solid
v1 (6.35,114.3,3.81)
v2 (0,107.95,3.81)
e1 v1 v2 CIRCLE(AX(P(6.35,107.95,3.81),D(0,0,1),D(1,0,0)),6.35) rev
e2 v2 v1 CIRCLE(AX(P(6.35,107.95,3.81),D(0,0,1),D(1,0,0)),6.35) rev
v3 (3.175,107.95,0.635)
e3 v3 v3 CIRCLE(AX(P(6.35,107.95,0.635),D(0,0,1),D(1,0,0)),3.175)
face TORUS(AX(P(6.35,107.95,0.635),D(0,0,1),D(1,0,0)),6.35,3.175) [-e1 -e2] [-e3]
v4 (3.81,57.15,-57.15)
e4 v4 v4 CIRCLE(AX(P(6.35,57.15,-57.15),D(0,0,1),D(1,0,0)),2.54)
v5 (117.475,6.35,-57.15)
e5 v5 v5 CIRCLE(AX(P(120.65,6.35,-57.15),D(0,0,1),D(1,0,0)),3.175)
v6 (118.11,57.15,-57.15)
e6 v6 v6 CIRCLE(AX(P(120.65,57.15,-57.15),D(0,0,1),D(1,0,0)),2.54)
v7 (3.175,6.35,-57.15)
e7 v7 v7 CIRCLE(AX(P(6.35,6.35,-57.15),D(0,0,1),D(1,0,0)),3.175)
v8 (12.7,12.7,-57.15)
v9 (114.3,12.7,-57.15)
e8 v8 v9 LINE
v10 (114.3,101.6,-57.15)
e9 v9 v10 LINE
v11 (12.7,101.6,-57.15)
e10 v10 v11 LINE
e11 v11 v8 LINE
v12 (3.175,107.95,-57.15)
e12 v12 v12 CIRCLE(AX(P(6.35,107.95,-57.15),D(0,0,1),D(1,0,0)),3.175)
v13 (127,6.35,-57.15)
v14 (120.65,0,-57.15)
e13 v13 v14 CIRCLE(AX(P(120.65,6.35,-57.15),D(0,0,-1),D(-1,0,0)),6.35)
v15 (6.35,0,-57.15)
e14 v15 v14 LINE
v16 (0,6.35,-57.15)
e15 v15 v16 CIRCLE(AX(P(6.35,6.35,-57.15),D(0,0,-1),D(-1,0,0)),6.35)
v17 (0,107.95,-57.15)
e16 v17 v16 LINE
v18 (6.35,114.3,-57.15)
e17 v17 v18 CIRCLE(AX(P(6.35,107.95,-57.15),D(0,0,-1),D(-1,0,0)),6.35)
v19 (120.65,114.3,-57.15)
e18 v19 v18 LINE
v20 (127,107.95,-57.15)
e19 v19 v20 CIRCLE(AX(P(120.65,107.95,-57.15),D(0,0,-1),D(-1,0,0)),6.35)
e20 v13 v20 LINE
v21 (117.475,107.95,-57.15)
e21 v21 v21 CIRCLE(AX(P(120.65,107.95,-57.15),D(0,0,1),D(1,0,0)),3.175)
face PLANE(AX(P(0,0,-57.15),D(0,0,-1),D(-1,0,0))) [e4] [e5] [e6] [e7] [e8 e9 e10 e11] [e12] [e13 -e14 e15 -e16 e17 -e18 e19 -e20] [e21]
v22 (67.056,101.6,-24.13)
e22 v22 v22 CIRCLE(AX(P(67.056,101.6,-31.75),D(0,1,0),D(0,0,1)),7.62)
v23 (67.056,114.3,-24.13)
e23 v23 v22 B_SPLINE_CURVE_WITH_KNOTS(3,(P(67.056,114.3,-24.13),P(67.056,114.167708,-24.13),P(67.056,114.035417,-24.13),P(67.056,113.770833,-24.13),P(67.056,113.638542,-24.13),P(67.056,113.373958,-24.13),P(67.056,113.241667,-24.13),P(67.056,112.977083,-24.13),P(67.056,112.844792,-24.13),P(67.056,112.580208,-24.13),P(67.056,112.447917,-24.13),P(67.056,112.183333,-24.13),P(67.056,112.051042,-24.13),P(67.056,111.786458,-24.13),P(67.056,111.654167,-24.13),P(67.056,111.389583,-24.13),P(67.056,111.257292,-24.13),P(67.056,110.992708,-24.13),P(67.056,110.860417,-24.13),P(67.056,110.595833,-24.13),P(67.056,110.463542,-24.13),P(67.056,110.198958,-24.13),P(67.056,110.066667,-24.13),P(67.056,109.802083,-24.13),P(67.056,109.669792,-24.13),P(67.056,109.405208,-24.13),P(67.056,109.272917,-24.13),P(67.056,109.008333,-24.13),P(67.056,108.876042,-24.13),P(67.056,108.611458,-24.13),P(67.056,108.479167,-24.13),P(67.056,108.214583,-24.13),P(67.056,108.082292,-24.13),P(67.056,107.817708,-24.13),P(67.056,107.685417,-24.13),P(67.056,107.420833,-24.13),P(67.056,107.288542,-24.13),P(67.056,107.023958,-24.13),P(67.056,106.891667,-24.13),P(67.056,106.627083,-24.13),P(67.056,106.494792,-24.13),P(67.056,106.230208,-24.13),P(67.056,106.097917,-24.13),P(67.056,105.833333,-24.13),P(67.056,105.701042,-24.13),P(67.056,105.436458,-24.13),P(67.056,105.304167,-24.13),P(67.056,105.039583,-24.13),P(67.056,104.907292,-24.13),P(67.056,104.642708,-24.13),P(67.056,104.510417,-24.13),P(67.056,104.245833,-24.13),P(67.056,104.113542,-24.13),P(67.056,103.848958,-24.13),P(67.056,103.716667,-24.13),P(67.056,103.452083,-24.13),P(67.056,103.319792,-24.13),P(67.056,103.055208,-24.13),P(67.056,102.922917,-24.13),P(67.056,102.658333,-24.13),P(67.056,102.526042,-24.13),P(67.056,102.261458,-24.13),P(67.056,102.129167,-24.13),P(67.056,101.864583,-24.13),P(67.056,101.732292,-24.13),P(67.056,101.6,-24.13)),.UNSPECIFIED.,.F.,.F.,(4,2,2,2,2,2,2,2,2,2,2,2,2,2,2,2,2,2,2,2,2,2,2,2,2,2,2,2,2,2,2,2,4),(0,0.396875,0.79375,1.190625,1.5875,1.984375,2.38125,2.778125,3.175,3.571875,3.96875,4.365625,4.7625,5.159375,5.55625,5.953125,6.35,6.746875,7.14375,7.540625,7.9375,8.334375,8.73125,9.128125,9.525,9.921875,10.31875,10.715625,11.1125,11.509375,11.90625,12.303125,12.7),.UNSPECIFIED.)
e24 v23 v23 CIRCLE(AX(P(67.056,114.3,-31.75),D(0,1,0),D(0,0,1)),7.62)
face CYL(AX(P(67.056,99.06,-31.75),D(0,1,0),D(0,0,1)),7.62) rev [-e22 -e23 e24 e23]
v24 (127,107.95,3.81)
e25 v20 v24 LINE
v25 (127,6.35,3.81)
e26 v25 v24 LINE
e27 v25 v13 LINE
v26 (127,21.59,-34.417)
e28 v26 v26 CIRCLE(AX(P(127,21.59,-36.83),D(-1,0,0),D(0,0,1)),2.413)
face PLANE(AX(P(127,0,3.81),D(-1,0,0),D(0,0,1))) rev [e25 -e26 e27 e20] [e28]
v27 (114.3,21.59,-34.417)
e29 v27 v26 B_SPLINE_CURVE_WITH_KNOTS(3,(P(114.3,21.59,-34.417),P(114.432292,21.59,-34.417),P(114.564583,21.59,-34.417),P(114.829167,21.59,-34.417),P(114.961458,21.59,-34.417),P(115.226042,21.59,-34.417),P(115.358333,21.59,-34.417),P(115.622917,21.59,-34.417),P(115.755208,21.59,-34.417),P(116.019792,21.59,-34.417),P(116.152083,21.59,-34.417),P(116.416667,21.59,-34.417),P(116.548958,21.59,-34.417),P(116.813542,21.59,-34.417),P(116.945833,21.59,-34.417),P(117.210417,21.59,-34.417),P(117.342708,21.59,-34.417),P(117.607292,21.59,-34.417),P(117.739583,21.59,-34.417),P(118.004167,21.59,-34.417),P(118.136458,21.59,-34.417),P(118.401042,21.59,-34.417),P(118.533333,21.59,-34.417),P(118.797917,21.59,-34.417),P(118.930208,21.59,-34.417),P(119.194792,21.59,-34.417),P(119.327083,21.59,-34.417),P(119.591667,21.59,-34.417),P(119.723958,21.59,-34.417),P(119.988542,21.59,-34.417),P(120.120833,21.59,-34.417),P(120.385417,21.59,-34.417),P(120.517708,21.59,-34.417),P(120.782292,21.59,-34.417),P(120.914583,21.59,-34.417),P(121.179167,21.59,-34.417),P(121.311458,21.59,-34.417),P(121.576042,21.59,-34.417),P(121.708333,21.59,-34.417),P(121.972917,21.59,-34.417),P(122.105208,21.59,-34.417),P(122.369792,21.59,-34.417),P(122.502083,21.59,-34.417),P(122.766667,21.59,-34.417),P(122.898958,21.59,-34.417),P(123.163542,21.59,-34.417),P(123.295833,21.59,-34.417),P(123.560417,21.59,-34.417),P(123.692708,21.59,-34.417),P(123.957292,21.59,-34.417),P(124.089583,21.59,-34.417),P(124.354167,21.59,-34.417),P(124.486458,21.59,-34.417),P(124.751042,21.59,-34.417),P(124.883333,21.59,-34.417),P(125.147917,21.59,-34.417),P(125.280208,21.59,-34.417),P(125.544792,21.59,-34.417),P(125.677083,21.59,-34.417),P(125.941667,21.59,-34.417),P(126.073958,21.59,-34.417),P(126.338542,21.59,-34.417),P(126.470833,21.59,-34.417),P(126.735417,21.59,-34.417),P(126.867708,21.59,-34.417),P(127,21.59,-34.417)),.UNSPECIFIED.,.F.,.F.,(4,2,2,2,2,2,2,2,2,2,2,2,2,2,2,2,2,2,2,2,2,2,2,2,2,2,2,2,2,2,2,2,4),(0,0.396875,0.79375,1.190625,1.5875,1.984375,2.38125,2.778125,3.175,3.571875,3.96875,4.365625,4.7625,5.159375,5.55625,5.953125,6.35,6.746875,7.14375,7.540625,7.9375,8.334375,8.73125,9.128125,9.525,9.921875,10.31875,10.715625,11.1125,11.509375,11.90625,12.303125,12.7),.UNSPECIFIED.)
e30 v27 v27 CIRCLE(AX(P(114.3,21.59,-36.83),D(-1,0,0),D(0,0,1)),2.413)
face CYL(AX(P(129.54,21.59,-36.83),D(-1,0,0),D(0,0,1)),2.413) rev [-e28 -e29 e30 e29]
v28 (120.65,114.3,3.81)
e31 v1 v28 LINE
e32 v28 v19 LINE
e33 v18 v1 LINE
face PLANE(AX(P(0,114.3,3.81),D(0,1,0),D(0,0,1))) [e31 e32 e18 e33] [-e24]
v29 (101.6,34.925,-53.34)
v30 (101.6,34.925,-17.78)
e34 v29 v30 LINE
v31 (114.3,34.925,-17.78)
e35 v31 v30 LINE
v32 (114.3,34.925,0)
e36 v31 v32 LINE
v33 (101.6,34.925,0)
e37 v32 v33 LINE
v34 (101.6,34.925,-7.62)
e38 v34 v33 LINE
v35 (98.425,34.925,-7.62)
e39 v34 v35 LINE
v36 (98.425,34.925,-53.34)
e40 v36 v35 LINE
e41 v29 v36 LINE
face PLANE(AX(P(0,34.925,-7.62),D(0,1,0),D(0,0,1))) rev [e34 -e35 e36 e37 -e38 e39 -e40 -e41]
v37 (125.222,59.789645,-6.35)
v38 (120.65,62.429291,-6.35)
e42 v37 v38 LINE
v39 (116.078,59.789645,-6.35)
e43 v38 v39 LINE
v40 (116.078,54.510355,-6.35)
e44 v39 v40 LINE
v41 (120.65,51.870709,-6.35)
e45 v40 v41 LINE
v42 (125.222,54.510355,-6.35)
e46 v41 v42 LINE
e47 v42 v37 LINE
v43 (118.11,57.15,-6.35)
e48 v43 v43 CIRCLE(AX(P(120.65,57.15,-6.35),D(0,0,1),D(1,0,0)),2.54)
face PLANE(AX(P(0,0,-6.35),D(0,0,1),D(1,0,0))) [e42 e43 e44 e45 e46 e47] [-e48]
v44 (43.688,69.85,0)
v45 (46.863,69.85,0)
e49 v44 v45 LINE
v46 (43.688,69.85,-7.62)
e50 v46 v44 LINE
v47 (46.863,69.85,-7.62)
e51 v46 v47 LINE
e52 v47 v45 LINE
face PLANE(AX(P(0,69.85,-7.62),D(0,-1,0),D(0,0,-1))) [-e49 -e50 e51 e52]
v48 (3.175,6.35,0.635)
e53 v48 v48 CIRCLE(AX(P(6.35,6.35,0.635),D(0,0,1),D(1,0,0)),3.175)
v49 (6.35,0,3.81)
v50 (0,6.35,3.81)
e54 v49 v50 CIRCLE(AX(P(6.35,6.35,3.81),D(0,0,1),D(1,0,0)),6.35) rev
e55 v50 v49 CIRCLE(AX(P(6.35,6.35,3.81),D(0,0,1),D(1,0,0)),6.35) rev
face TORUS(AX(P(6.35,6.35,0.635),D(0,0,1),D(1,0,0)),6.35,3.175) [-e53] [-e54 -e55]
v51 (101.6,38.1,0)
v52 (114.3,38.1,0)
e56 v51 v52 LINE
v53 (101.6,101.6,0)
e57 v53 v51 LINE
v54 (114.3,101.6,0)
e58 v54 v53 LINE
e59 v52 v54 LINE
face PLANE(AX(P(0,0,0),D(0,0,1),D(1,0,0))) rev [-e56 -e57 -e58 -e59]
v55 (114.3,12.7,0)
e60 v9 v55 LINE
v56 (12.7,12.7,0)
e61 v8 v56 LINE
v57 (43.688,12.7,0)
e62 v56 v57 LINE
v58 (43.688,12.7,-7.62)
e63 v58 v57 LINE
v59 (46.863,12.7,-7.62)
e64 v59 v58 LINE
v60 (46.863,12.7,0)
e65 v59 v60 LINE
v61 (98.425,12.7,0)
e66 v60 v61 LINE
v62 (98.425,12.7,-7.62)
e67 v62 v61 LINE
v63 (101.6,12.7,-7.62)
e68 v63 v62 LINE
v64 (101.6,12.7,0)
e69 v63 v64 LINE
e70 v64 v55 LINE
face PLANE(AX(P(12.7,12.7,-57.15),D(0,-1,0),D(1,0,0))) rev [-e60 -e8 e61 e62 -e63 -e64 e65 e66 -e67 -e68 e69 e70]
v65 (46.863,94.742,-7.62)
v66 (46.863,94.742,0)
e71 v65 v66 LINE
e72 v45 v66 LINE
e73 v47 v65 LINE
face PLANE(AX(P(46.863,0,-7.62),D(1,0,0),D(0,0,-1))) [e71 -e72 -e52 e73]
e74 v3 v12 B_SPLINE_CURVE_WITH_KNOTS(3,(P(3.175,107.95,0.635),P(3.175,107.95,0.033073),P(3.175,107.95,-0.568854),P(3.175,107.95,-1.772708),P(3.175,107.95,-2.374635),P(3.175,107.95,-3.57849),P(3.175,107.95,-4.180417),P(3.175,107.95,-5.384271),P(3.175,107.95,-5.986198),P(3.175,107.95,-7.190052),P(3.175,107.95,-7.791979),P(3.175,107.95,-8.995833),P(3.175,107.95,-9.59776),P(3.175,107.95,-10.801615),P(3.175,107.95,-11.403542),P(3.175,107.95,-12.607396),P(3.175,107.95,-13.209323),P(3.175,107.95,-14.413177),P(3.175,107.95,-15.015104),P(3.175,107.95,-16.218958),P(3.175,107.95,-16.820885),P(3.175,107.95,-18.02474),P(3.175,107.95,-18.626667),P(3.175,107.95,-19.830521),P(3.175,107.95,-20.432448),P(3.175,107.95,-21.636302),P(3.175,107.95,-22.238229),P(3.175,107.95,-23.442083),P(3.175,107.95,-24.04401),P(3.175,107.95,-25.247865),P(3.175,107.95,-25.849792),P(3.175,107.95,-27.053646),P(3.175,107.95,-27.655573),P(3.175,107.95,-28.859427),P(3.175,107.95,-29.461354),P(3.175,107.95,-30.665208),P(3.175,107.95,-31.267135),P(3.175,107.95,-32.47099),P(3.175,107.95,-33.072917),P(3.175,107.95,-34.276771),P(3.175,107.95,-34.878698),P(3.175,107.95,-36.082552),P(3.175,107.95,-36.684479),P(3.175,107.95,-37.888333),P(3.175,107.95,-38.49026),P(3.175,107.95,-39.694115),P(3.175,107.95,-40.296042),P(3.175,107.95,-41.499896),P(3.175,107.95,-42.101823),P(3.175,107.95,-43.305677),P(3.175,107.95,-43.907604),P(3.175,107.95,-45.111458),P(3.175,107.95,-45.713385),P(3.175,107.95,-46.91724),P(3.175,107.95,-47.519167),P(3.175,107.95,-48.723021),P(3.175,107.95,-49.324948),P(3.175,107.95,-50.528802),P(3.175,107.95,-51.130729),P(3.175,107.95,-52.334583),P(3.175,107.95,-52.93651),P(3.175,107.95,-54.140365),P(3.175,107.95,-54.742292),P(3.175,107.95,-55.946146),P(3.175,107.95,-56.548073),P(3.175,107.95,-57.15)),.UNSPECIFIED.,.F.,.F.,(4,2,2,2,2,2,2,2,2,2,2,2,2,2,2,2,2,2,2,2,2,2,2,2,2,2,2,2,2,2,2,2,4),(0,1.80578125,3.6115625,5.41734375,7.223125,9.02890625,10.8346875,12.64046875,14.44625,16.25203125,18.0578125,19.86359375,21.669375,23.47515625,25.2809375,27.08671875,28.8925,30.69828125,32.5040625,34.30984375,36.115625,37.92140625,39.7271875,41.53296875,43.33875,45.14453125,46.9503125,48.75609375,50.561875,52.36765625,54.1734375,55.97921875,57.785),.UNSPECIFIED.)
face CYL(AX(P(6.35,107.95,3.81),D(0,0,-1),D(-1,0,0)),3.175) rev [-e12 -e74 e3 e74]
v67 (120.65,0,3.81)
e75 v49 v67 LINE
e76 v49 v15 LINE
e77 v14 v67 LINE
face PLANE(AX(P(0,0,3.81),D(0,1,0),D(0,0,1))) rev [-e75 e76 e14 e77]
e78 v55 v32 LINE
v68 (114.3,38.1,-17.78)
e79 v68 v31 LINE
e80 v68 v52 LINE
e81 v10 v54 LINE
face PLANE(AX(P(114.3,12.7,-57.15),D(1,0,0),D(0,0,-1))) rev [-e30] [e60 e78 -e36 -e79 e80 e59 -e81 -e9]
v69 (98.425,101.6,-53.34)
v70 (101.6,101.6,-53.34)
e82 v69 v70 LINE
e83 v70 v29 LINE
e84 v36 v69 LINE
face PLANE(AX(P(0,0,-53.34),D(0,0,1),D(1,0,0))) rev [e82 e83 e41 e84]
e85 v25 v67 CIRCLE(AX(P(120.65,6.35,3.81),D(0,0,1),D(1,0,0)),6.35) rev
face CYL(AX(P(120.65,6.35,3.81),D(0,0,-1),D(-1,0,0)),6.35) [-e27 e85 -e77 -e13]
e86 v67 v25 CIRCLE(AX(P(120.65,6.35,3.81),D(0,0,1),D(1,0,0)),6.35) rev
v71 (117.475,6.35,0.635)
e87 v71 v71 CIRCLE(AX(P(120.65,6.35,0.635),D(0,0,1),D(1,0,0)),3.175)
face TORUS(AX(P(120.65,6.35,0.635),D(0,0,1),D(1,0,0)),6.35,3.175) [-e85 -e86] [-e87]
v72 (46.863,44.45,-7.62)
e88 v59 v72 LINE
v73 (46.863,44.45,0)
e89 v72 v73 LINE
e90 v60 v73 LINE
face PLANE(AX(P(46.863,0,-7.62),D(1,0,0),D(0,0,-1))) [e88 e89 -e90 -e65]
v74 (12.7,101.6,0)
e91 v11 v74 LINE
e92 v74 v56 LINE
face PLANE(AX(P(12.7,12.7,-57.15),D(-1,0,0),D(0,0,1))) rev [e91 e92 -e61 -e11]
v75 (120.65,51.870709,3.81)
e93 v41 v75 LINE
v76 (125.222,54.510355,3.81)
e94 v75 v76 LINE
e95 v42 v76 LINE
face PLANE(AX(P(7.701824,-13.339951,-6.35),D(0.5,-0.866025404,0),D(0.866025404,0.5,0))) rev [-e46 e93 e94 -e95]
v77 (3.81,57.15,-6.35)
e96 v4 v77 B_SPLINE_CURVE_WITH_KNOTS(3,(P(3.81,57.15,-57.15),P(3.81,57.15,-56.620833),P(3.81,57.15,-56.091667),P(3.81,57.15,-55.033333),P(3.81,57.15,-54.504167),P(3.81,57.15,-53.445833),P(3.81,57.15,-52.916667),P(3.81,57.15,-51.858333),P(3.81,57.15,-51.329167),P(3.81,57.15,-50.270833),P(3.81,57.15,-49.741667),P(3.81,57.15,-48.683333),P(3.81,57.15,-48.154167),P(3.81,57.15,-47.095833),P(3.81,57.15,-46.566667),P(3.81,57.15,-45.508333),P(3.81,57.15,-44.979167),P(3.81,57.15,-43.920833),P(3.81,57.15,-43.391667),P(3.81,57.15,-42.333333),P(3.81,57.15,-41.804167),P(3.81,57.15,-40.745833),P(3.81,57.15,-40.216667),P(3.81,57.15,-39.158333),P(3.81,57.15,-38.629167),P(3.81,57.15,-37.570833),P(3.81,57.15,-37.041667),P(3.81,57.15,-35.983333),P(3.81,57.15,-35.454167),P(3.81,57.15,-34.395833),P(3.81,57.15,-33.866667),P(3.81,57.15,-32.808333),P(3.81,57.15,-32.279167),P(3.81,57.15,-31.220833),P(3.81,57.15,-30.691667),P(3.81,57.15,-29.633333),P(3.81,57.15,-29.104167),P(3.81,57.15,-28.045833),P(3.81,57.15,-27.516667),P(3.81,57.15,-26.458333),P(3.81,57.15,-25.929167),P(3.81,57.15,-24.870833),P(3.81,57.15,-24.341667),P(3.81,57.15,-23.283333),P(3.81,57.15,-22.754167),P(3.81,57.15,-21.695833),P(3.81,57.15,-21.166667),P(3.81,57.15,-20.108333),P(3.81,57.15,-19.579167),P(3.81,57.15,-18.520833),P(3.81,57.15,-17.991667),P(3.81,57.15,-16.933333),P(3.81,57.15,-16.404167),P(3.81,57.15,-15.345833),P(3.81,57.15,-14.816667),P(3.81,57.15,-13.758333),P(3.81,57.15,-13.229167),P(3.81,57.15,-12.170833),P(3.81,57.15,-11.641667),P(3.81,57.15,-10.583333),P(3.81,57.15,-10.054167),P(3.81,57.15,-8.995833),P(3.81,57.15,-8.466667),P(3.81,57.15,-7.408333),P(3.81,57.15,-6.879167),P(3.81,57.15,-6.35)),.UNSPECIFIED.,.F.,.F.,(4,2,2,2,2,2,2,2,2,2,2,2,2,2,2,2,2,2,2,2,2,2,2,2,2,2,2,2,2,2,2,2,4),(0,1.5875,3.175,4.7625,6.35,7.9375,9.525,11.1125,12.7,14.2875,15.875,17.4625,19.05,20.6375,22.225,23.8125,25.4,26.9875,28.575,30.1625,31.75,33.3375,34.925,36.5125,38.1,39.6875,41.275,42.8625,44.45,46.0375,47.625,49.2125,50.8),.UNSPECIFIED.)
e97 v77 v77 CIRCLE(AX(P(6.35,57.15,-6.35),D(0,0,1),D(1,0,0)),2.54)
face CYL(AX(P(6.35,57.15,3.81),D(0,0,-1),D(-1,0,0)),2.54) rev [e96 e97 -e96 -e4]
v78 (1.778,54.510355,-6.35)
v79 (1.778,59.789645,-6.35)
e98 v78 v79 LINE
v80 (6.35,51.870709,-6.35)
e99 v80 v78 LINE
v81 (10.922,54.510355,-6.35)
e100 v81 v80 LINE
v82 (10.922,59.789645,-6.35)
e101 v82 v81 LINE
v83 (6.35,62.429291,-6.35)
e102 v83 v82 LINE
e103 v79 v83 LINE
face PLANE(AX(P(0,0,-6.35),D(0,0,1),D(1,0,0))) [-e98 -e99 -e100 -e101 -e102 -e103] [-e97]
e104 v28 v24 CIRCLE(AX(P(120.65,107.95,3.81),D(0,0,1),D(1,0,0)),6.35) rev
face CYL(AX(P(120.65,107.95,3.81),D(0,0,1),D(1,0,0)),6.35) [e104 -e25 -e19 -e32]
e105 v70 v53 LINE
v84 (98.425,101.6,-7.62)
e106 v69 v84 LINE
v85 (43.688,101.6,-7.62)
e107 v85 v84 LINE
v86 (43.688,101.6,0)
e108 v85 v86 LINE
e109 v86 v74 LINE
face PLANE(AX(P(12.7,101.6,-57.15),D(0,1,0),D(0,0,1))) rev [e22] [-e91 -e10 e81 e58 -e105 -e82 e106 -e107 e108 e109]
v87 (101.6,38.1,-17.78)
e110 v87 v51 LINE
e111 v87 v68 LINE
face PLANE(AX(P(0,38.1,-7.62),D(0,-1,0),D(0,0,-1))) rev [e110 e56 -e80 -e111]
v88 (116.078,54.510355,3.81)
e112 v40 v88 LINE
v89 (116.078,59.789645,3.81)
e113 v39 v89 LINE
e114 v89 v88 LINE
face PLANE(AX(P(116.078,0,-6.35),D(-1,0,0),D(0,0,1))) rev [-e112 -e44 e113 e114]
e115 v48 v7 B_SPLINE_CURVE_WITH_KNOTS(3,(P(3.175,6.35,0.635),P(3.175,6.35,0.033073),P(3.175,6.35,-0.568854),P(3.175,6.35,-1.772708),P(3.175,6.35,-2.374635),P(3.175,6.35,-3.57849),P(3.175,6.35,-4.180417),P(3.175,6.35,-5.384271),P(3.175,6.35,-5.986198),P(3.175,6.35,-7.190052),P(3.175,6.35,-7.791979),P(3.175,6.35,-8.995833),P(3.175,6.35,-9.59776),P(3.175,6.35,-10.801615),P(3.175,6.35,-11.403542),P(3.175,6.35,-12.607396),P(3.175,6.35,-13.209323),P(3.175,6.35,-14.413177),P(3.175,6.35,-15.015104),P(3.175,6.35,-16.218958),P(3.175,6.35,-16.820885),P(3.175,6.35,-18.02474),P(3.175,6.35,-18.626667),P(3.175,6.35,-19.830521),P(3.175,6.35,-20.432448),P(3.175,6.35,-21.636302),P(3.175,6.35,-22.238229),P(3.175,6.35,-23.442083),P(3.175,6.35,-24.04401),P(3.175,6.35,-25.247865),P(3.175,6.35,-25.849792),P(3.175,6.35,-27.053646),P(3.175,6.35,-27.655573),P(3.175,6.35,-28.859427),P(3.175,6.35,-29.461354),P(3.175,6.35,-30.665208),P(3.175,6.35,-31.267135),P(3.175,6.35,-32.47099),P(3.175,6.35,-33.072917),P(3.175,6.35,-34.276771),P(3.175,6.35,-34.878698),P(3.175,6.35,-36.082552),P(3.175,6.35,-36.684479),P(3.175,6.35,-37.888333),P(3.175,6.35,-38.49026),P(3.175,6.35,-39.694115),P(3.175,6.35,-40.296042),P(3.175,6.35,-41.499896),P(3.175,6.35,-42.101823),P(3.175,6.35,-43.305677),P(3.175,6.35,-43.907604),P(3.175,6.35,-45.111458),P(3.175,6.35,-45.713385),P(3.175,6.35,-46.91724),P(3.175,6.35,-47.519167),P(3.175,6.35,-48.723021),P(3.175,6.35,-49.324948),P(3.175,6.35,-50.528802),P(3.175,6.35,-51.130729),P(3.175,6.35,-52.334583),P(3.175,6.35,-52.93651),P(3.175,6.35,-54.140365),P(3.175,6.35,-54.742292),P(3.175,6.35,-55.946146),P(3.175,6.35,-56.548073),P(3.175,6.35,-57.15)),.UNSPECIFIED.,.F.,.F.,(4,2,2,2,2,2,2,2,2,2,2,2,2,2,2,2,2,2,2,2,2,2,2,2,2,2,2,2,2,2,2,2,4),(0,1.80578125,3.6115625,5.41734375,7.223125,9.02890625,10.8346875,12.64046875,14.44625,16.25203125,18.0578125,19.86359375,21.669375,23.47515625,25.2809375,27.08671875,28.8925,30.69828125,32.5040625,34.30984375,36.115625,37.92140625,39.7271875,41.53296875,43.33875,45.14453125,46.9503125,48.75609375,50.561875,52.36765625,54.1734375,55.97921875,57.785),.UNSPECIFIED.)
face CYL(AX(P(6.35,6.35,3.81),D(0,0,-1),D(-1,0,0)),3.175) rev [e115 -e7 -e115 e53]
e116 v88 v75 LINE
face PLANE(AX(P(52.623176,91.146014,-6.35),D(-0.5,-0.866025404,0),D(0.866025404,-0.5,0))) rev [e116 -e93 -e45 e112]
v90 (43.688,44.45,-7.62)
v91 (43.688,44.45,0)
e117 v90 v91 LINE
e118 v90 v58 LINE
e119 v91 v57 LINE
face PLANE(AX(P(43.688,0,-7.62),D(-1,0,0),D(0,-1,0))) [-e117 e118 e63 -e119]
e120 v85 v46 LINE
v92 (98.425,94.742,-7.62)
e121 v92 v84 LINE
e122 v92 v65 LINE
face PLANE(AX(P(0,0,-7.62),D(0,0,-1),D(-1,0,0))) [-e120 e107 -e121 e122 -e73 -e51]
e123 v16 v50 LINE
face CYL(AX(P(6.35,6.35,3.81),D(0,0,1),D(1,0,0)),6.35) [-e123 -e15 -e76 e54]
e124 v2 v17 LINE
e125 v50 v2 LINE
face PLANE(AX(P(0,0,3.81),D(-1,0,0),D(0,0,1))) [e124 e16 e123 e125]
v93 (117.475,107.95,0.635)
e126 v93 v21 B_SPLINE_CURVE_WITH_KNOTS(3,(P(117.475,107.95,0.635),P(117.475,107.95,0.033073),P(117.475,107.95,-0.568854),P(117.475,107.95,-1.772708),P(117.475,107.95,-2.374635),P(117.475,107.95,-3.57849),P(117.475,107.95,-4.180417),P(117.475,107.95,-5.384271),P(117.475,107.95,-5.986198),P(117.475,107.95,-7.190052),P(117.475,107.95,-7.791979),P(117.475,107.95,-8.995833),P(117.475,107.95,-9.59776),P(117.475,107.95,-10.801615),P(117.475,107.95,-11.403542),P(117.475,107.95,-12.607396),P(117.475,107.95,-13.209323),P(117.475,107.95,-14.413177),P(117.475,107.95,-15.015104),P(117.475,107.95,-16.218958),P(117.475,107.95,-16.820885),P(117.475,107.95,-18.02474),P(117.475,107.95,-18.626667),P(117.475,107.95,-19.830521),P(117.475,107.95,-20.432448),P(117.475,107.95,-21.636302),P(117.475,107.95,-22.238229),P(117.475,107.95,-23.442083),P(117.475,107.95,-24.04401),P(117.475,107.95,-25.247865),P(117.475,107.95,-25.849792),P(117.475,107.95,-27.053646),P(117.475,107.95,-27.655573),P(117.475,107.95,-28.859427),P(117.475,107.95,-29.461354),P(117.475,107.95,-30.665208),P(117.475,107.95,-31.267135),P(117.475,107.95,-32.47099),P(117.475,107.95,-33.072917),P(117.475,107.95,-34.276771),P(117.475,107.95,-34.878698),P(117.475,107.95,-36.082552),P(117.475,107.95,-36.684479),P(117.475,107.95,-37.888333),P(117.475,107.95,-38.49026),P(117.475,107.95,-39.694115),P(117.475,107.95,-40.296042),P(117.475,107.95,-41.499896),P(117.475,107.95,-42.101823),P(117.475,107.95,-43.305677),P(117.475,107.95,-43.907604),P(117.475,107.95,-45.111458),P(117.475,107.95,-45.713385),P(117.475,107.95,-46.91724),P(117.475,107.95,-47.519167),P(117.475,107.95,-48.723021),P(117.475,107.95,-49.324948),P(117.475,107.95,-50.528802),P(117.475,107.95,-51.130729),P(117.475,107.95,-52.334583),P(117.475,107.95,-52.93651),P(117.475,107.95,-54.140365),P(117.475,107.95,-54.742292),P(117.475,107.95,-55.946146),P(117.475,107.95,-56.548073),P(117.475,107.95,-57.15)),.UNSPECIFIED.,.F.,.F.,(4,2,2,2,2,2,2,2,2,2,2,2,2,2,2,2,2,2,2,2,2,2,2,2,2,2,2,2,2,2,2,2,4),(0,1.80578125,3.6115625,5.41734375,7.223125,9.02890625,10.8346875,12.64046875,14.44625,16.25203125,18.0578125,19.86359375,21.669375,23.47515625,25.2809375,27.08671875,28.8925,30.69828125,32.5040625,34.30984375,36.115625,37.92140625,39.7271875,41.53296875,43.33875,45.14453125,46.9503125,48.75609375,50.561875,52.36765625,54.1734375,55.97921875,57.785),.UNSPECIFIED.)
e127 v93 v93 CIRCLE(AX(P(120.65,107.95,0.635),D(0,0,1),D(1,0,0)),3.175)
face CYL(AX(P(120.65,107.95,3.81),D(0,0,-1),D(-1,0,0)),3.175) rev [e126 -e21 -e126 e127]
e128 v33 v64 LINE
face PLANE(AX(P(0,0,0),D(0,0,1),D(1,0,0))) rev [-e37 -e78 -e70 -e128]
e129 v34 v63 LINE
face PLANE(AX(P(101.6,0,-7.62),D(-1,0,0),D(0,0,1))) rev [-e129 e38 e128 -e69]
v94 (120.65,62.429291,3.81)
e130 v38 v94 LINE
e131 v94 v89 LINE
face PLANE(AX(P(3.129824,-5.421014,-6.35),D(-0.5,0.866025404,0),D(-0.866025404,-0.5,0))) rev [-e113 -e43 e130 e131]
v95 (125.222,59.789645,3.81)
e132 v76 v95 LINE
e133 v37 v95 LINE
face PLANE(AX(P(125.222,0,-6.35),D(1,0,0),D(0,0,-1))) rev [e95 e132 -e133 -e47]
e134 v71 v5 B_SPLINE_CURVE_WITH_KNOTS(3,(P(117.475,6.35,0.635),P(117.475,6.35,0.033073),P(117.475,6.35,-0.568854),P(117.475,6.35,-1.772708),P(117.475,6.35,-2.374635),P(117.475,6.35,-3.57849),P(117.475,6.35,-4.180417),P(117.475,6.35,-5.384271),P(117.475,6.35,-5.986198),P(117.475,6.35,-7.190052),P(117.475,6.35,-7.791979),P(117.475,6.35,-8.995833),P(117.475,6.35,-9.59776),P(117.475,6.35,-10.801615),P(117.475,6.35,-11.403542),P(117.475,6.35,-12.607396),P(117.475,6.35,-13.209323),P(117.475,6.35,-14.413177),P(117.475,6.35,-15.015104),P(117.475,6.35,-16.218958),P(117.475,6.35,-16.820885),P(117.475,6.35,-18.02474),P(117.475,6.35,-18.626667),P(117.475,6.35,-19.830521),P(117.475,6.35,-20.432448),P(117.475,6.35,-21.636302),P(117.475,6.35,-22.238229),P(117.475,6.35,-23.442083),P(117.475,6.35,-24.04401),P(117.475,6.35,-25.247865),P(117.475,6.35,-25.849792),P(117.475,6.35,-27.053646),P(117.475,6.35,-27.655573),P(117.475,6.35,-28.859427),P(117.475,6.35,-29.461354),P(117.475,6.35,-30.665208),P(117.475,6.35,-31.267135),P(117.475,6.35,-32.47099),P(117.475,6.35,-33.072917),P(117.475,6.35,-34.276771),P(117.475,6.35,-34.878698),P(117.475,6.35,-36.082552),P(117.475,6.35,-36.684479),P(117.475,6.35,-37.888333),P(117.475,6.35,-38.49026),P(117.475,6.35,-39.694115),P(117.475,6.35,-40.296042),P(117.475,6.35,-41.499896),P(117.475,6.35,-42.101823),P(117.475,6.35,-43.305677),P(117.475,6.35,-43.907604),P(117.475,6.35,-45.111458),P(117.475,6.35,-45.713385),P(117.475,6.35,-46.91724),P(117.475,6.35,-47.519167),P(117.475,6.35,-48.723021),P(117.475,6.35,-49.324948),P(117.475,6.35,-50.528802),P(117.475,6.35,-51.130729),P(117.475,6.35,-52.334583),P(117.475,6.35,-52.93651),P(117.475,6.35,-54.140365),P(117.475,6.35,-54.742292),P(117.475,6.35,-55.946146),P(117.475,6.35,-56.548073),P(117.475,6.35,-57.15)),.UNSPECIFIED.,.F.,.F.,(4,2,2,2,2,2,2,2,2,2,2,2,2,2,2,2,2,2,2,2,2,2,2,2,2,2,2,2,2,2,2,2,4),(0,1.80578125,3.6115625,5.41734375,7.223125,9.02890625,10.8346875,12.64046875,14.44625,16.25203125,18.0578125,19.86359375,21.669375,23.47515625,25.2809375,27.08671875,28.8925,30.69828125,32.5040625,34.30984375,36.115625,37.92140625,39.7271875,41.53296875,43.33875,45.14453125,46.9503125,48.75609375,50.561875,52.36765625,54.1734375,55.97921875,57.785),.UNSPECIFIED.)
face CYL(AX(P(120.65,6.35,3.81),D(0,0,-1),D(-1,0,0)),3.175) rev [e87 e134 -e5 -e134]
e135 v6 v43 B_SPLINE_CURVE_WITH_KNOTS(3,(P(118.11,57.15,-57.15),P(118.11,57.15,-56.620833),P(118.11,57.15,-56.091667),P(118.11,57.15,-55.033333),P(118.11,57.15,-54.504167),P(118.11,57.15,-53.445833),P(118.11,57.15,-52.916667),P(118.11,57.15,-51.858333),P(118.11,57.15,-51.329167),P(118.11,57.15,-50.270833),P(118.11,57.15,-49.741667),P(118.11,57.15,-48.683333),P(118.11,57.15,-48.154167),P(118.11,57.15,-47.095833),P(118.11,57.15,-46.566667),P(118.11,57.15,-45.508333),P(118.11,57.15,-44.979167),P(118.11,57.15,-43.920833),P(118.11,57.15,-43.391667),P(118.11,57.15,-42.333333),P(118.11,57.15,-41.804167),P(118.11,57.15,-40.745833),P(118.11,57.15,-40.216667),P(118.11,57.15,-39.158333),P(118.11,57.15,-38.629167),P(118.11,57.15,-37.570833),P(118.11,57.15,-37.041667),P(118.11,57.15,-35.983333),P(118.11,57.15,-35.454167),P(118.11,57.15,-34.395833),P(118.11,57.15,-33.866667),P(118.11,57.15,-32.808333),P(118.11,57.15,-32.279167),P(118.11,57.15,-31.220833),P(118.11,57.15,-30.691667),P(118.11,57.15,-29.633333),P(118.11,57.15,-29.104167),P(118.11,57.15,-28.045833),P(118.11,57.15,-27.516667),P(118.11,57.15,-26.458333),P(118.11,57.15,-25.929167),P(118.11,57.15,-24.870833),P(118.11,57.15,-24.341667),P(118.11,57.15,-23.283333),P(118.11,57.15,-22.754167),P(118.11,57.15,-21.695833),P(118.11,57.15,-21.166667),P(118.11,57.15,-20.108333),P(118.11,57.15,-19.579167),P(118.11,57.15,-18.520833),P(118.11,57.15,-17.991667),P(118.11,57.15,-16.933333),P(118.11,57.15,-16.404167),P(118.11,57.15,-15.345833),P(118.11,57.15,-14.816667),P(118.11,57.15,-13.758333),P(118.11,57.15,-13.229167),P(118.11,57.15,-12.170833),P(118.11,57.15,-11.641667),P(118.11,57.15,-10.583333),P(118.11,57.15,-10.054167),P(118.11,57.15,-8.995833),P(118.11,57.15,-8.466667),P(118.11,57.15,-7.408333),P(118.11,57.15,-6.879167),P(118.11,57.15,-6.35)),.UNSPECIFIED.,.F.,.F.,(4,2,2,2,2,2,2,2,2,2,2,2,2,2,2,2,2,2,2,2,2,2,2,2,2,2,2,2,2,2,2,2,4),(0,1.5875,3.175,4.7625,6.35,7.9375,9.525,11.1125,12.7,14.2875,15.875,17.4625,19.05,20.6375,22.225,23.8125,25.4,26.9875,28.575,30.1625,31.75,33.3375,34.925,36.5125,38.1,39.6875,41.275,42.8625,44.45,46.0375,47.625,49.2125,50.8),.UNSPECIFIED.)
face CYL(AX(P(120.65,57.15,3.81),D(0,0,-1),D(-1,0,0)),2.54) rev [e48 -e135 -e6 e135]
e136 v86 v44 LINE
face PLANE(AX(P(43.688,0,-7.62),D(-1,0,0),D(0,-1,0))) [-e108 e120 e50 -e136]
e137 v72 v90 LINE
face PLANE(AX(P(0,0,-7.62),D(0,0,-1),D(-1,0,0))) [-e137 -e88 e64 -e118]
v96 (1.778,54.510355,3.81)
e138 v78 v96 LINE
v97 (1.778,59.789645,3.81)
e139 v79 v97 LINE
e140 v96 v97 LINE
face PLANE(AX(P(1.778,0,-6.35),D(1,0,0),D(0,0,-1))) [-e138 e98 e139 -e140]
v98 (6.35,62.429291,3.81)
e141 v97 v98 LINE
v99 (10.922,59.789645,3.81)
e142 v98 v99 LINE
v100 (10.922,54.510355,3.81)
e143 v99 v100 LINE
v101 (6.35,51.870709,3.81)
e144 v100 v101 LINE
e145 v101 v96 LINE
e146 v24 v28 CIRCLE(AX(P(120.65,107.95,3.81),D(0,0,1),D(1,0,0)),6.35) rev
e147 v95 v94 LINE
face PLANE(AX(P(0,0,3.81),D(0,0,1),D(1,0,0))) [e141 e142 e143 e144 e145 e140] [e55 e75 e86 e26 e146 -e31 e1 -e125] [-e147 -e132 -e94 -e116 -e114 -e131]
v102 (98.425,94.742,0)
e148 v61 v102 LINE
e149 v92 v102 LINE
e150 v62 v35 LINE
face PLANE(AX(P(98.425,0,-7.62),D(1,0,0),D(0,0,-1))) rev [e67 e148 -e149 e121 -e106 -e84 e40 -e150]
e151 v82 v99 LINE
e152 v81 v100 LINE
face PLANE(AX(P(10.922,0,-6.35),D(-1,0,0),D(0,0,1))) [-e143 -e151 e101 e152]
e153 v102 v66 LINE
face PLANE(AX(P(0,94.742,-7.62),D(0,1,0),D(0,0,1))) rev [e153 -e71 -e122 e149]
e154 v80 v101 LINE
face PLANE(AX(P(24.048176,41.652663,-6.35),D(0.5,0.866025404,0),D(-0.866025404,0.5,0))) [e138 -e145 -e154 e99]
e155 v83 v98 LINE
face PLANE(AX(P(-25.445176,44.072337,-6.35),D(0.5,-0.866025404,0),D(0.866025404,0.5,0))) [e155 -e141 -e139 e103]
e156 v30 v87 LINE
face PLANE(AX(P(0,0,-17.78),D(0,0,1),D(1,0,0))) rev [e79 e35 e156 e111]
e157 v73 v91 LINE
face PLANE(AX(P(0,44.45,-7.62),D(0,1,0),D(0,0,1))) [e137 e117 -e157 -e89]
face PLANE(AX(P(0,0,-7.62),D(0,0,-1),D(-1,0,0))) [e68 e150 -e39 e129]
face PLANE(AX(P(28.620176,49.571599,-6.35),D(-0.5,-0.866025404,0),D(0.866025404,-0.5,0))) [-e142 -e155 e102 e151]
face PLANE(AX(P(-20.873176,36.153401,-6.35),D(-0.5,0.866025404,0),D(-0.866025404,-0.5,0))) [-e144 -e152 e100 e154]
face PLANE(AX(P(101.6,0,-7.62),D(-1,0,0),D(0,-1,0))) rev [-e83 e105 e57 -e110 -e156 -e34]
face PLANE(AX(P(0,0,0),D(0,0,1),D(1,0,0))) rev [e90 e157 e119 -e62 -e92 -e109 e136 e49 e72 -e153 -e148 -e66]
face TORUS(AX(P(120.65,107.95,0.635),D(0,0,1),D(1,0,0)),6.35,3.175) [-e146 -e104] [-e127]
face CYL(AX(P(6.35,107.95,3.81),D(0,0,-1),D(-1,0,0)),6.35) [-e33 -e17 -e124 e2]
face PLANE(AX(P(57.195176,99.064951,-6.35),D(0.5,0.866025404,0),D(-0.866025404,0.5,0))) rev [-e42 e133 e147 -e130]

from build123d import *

# Parameters (mm, degrees)
SKETCH2_W           = 127
SKETCH2_H           = 114.3
SKETCH2_R           = 3.175
SKETCH2_R_2         = 2.54
BOSS_EXTRUDE2_DEPTH = 3.81
FILLET1_R           = 3.175
BOSS_EXTRUDE3_START = -57.15
SKETCH2_4_W         = 127
SKETCH2_4_H         = 114.3
SKETCH2_4_R         = 3.175
SKETCH2_4_R_2       = 2.54
SKETCH2_4_W_2       = 101.6
SKETCH2_4_H_2       = 88.9
BOSS_EXTRUDE3_DEPTH = 57.15
FILLET3_R           = 6.35
SKETCH3_W           = 3.175
SKETCH3_H           = 31.75
BOSS_EXTRUDE4_DEPTH = 7.62
SKETCH4_W           = 12.7
SKETCH4_H           = 3.175
BOSS_EXTRUDE5_DEPTH = 10.16
SKETCH5_W           = 3.175
SKETCH5_H           = 66.675
BOSS_EXTRUDE6_DEPTH = 45.72
CUT_EXTRUDE1_START  = -10.16
SKETCH6_R           = 4.572
SKETCH6_R_2         = 2.54
CUT_EXTRUDE1_DEPTH  = 10.16
SKETCH7_R           = 7.62
CUT_EXTRUDE2_DEPTH  = 15.24
SKETCH8_R           = 2.413
CUT_EXTRUDE3_DEPTH  = 15.24


with BuildPart() as part:
    # Sketch2 → Boss-Extrude2 (new body)
    with BuildSketch(Plane.XY):
        with Locations((63.5, 57.15)):
            Rectangle(SKETCH2_W, SKETCH2_H)
        with Locations(Location((6.35, 107.95, 0), (0, 0, 180))):
            Circle(SKETCH2_R, mode=Mode.SUBTRACT)
        with Locations(Location((120.65, 107.95, 0), (0, 0, 180))):
            Circle(SKETCH2_R, mode=Mode.SUBTRACT)
        with Locations(Location((120.65, 6.35, 0), (0, 0, 180))):
            Circle(SKETCH2_R, mode=Mode.SUBTRACT)
        with Locations(Location((6.35, 6.35, 0), (0, 0, 180))):
            Circle(SKETCH2_R, mode=Mode.SUBTRACT)
        with Locations(Location((6.35, 57.15, 0), (0, 0, 180))):
            Circle(SKETCH2_R_2, mode=Mode.SUBTRACT)
        with Locations(Location((120.65, 57.15, 0), (0, 0, 180))):
            Circle(SKETCH2_R_2, mode=Mode.SUBTRACT)
    extrude(amount=BOSS_EXTRUDE2_DEPTH)

    # Fillet1
    fillet1_edges = [part.edges().sort_by_distance(p)[0] for p in [
        (123.825, 107.95, 3.81),
        (9.525, 107.95, 3.81),
        (9.525, 6.35, 3.81),
        (123.825, 6.35, 3.81),
    ]]
    fillet(fillet1_edges, radius=FILLET1_R - 0.0001)  # a hair under: the kernel refuses the full size

    # Sketch2<4> → Boss-Extrude3 (add)
    with BuildSketch(Plane.XY.offset(BOSS_EXTRUDE3_START)):
        with Locations((63.5, 57.15)):
            Rectangle(SKETCH2_4_W, SKETCH2_4_H)
        with Locations(Location((6.35, 107.95, 0), (0, 0, 180))):
            Circle(SKETCH2_4_R, mode=Mode.SUBTRACT)
        with Locations(Location((120.65, 107.95, 0), (0, 0, 180))):
            Circle(SKETCH2_4_R, mode=Mode.SUBTRACT)
        with Locations(Location((120.65, 6.35, 0), (0, 0, 180))):
            Circle(SKETCH2_4_R, mode=Mode.SUBTRACT)
        with Locations(Location((6.35, 6.35, 0), (0, 0, 180))):
            Circle(SKETCH2_4_R, mode=Mode.SUBTRACT)
        with Locations(Location((6.35, 57.15, 0), (0, 0, 180))):
            Circle(SKETCH2_4_R_2, mode=Mode.SUBTRACT)
        with Locations(Location((120.65, 57.15, 0), (0, 0, 180))):
            Circle(SKETCH2_4_R_2, mode=Mode.SUBTRACT)
        with Locations((63.5, 57.15)):
            Rectangle(SKETCH2_4_W_2, SKETCH2_4_H_2, mode=Mode.SUBTRACT)
    extrude(amount=BOSS_EXTRUDE3_DEPTH)

    # Fillet3
    fillet3_edges = [part.edges().sort_by_distance(p)[0] for p in [
        (0, 0, -26.67),
        (127, 0, -26.67),
        (127, 114.3, -26.67),
        (0, 114.3, -26.67),
    ]]
    fillet(fillet3_edges, radius=FILLET3_R)

    # Sketch3 → Boss-Extrude4 (add)
    with BuildSketch(Plane(origin=(0, 0, 0), x_dir=(-1, 0, 0), z_dir=(0, 0, -1))):
        Polygon((-101.6, 101.6), (-101.6, 38.1), (-114.3, 38.1), (-114.3, 34.925), (-101.6, 34.925), (-101.6, 12.7), (-98.425, 12.7), (-98.425, 94.742), (-46.863, 94.742), (-46.863, 69.85), (-43.688, 69.85), (-43.688, 101.6), align=None)
        with Locations((-45.2755, 28.575)):
            Rectangle(SKETCH3_W, SKETCH3_H)
    extrude(amount=BOSS_EXTRUDE4_DEPTH)

    # Sketch4 → Boss-Extrude5 (add)
    with BuildSketch(Plane(origin=(0, 0, -7.62), x_dir=(-1, 0, 0), z_dir=(0, 0, -1))):
        with Locations((-107.95, 36.5125)):
            Rectangle(SKETCH4_W, SKETCH4_H)
    extrude(amount=BOSS_EXTRUDE5_DEPTH)

    # Sketch5 → Boss-Extrude6 (add)
    with BuildSketch(Plane(origin=(0, 0, -7.62), x_dir=(-1, 0, 0), z_dir=(0, 0, -1))):
        with Locations((-100.0125, 68.2625)):
            Rectangle(SKETCH5_W, SKETCH5_H)
    extrude(amount=BOSS_EXTRUDE6_DEPTH)

    # Sketch6 → Cut-Extrude1 (cut)
    # profile 1 of 16: a face of its own
    with BuildSketch(Plane.XY.offset(3.81).offset(CUT_EXTRUDE1_START)):
        with BuildLine():
            Line((6.35, 62.429290861), (4.063999941, 61.109468112))
            ThreePointArc((4.063999941, 61.109468112), (6.349999924, 61.722), (8.635999927, 61.109468188))
            Line((8.635999927, 61.109468188), (6.35, 62.429290861))
        make_face()
    # profile 2 of 16: a face of its own
    with BuildSketch(Plane.XY.offset(3.81).offset(CUT_EXTRUDE1_START)):
        with BuildLine():
            Line((1.778, 59.789645431), (1.778, 57.15))
            ThreePointArc((1.778, 57.15), (2.390531837, 59.43599997), (4.063999941, 61.109468112))
            Line((4.063999941, 61.109468112), (1.778, 59.789645431))
        make_face()
    # profile 3 of 16: a face of its own
    with BuildSketch(Plane.XY.offset(3.81).offset(CUT_EXTRUDE1_START)):
        with BuildLine():
            Line((1.778, 57.15), (1.778, 54.510354569))
            Line((1.778, 54.510354569), (4.063999941, 53.190531888))
            ThreePointArc((4.063999941, 53.190531888), (2.390531837, 54.86400003), (1.778, 57.15))
        make_face()
    # profile 4 of 16: a face of its own
    with BuildSketch(Plane.XY.offset(3.81).offset(CUT_EXTRUDE1_START)):
        with BuildLine():
            ThreePointArc((8.636000059, 53.190531888), (6.35, 52.578), (4.063999941, 53.190531888))
            Line((4.063999941, 53.190531888), (6.35, 51.870709139))
            Line((6.35, 51.870709139), (8.636000059, 53.190531888))
        make_face()
    # profile 5 of 16: a face of its own
    with BuildSketch(Plane.XY.offset(3.81).offset(CUT_EXTRUDE1_START)):
        with BuildLine():
            ThreePointArc((10.922, 57.15), (10.309468163, 54.86400003), (8.636000059, 53.190531888))
            Line((8.636000059, 53.190531888), (10.922, 54.510354569))
            Line((10.922, 54.510354569), (10.922, 57.15))
        make_face()
    # profile 6 of 16: a face of its own
    with BuildSketch(Plane.XY.offset(3.81).offset(CUT_EXTRUDE1_START)):
        with BuildLine():
            Line((10.922, 59.789645431), (8.635999927, 61.109468188))
            ThreePointArc((8.635999927, 61.109468188), (10.309468125, 59.436000037), (10.922, 57.15))
            Line((10.922, 57.15), (10.922, 59.789645431))
        make_face()
    # profile 7 of 16: a face of its own
    with BuildSketch(Plane.XY.offset(3.81).offset(CUT_EXTRUDE1_START)):
        with Locations((6.35, 57.15)):
            Circle(SKETCH6_R)
        with Locations(Location((6.35, 57.15, 0), (0, 0, 180))):
            Circle(SKETCH6_R_2, mode=Mode.SUBTRACT)
    # profile 8 of 16: a face of its own
    with BuildSketch(Plane.XY.offset(3.81).offset(CUT_EXTRUDE1_START)):
        with Locations(Location((6.35, 57.15, 0), (0, 0, 180))):
            Circle(SKETCH6_R_2)
    # profile 9 of 16: a face of its own
    with BuildSketch(Plane.XY.offset(3.81).offset(CUT_EXTRUDE1_START)):
        with BuildLine():
            ThreePointArc((116.078, 57.15), (116.69053188, 59.436000046), (118.364000092, 61.109468199))
            Line((118.364000092, 61.109468199), (116.078, 59.789645431))
            Line((116.078, 59.789645431), (116.078, 57.15))
        make_face()
    # profile 10 of 16: a face of its own
    with BuildSketch(Plane.XY.offset(3.81).offset(CUT_EXTRUDE1_START)):
        with BuildLine():
            Line((116.078, 54.510354569), (118.363999941, 53.190531888))
            ThreePointArc((118.363999941, 53.190531888), (116.690531837, 54.86400003), (116.078, 57.15))
            Line((116.078, 57.15), (116.078, 54.510354569))
        make_face()
    # profile 11 of 16: a face of its own
    with BuildSketch(Plane.XY.offset(3.81).offset(CUT_EXTRUDE1_START)):
        with BuildLine():
            Line((120.65, 51.870709139), (122.935999915, 53.190531805))
            ThreePointArc((122.935999915, 53.190531805), (120.649999917, 52.578), (118.363999941, 53.190531888))
            Line((118.363999941, 53.190531888), (120.65, 51.870709139))
        make_face()
    # profile 12 of 16: a face of its own
    with BuildSketch(Plane.XY.offset(3.81).offset(CUT_EXTRUDE1_START)):
        with BuildLine():
            Line((122.935999915, 53.190531805), (125.222, 54.510354569))
            Line((125.222, 54.510354569), (125.222, 57.15))
            ThreePointArc((125.222, 57.15), (124.609468122, 54.863999958), (122.935999915, 53.190531805))
        make_face()
    # profile 13 of 16: a face of its own
    with BuildSketch(Plane.XY.offset(3.81).offset(CUT_EXTRUDE1_START)):
        with BuildLine():
            ThreePointArc((122.936000059, 61.109468112), (124.609468163, 59.43599997), (125.222, 57.15))
            Line((125.222, 57.15), (125.222, 59.789645431))
            Line((125.222, 59.789645431), (122.936000059, 61.109468112))
        make_face()
    # profile 14 of 16: a face of its own
    with BuildSketch(Plane.XY.offset(3.81).offset(CUT_EXTRUDE1_START)):
        with BuildLine():
            ThreePointArc((118.364000092, 61.109468199), (120.650000087, 61.722), (122.936000059, 61.109468112))
            Line((122.936000059, 61.109468112), (120.65, 62.429290861))
            Line((120.65, 62.429290861), (118.364000092, 61.109468199))
        make_face()
    # profile 15 of 16: a face of its own
    with BuildSketch(Plane.XY.offset(3.81).offset(CUT_EXTRUDE1_START)):
        with Locations((120.65, 57.15)):
            Circle(SKETCH6_R)
        with Locations(Location((120.65, 57.15, 0), (0, 0, 180))):
            Circle(SKETCH6_R_2, mode=Mode.SUBTRACT)
    # profile 16 of 16: a face of its own
    with BuildSketch(Plane.XY.offset(3.81).offset(CUT_EXTRUDE1_START)):
        with Locations(Location((120.65, 57.15, 0), (0, 0, 180))):
            Circle(SKETCH6_R_2)
    extrude(amount=CUT_EXTRUDE1_DEPTH, mode=Mode.SUBTRACT)

    # Sketch7 → Cut-Extrude2 (cut)
    with BuildSketch(Plane(origin=(0, 114.3, 0), x_dir=(1, 0, 0), z_dir=(0, 1, 0))):
        with Locations(Location((67.056, 31.75, 0), (0, 0, 270))):
            Circle(SKETCH7_R)
    extrude(amount=-CUT_EXTRUDE2_DEPTH, mode=Mode.SUBTRACT)

    # Sketch8 → Cut-Extrude3 (cut)
    with BuildSketch(Plane.ZY.offset(-114.3)):
        with Locations((-36.83, 21.59)):
            Circle(SKETCH8_R)
    extrude(amount=-CUT_EXTRUDE3_DEPTH, mode=Mode.SUBTRACT)


solid = part.part
